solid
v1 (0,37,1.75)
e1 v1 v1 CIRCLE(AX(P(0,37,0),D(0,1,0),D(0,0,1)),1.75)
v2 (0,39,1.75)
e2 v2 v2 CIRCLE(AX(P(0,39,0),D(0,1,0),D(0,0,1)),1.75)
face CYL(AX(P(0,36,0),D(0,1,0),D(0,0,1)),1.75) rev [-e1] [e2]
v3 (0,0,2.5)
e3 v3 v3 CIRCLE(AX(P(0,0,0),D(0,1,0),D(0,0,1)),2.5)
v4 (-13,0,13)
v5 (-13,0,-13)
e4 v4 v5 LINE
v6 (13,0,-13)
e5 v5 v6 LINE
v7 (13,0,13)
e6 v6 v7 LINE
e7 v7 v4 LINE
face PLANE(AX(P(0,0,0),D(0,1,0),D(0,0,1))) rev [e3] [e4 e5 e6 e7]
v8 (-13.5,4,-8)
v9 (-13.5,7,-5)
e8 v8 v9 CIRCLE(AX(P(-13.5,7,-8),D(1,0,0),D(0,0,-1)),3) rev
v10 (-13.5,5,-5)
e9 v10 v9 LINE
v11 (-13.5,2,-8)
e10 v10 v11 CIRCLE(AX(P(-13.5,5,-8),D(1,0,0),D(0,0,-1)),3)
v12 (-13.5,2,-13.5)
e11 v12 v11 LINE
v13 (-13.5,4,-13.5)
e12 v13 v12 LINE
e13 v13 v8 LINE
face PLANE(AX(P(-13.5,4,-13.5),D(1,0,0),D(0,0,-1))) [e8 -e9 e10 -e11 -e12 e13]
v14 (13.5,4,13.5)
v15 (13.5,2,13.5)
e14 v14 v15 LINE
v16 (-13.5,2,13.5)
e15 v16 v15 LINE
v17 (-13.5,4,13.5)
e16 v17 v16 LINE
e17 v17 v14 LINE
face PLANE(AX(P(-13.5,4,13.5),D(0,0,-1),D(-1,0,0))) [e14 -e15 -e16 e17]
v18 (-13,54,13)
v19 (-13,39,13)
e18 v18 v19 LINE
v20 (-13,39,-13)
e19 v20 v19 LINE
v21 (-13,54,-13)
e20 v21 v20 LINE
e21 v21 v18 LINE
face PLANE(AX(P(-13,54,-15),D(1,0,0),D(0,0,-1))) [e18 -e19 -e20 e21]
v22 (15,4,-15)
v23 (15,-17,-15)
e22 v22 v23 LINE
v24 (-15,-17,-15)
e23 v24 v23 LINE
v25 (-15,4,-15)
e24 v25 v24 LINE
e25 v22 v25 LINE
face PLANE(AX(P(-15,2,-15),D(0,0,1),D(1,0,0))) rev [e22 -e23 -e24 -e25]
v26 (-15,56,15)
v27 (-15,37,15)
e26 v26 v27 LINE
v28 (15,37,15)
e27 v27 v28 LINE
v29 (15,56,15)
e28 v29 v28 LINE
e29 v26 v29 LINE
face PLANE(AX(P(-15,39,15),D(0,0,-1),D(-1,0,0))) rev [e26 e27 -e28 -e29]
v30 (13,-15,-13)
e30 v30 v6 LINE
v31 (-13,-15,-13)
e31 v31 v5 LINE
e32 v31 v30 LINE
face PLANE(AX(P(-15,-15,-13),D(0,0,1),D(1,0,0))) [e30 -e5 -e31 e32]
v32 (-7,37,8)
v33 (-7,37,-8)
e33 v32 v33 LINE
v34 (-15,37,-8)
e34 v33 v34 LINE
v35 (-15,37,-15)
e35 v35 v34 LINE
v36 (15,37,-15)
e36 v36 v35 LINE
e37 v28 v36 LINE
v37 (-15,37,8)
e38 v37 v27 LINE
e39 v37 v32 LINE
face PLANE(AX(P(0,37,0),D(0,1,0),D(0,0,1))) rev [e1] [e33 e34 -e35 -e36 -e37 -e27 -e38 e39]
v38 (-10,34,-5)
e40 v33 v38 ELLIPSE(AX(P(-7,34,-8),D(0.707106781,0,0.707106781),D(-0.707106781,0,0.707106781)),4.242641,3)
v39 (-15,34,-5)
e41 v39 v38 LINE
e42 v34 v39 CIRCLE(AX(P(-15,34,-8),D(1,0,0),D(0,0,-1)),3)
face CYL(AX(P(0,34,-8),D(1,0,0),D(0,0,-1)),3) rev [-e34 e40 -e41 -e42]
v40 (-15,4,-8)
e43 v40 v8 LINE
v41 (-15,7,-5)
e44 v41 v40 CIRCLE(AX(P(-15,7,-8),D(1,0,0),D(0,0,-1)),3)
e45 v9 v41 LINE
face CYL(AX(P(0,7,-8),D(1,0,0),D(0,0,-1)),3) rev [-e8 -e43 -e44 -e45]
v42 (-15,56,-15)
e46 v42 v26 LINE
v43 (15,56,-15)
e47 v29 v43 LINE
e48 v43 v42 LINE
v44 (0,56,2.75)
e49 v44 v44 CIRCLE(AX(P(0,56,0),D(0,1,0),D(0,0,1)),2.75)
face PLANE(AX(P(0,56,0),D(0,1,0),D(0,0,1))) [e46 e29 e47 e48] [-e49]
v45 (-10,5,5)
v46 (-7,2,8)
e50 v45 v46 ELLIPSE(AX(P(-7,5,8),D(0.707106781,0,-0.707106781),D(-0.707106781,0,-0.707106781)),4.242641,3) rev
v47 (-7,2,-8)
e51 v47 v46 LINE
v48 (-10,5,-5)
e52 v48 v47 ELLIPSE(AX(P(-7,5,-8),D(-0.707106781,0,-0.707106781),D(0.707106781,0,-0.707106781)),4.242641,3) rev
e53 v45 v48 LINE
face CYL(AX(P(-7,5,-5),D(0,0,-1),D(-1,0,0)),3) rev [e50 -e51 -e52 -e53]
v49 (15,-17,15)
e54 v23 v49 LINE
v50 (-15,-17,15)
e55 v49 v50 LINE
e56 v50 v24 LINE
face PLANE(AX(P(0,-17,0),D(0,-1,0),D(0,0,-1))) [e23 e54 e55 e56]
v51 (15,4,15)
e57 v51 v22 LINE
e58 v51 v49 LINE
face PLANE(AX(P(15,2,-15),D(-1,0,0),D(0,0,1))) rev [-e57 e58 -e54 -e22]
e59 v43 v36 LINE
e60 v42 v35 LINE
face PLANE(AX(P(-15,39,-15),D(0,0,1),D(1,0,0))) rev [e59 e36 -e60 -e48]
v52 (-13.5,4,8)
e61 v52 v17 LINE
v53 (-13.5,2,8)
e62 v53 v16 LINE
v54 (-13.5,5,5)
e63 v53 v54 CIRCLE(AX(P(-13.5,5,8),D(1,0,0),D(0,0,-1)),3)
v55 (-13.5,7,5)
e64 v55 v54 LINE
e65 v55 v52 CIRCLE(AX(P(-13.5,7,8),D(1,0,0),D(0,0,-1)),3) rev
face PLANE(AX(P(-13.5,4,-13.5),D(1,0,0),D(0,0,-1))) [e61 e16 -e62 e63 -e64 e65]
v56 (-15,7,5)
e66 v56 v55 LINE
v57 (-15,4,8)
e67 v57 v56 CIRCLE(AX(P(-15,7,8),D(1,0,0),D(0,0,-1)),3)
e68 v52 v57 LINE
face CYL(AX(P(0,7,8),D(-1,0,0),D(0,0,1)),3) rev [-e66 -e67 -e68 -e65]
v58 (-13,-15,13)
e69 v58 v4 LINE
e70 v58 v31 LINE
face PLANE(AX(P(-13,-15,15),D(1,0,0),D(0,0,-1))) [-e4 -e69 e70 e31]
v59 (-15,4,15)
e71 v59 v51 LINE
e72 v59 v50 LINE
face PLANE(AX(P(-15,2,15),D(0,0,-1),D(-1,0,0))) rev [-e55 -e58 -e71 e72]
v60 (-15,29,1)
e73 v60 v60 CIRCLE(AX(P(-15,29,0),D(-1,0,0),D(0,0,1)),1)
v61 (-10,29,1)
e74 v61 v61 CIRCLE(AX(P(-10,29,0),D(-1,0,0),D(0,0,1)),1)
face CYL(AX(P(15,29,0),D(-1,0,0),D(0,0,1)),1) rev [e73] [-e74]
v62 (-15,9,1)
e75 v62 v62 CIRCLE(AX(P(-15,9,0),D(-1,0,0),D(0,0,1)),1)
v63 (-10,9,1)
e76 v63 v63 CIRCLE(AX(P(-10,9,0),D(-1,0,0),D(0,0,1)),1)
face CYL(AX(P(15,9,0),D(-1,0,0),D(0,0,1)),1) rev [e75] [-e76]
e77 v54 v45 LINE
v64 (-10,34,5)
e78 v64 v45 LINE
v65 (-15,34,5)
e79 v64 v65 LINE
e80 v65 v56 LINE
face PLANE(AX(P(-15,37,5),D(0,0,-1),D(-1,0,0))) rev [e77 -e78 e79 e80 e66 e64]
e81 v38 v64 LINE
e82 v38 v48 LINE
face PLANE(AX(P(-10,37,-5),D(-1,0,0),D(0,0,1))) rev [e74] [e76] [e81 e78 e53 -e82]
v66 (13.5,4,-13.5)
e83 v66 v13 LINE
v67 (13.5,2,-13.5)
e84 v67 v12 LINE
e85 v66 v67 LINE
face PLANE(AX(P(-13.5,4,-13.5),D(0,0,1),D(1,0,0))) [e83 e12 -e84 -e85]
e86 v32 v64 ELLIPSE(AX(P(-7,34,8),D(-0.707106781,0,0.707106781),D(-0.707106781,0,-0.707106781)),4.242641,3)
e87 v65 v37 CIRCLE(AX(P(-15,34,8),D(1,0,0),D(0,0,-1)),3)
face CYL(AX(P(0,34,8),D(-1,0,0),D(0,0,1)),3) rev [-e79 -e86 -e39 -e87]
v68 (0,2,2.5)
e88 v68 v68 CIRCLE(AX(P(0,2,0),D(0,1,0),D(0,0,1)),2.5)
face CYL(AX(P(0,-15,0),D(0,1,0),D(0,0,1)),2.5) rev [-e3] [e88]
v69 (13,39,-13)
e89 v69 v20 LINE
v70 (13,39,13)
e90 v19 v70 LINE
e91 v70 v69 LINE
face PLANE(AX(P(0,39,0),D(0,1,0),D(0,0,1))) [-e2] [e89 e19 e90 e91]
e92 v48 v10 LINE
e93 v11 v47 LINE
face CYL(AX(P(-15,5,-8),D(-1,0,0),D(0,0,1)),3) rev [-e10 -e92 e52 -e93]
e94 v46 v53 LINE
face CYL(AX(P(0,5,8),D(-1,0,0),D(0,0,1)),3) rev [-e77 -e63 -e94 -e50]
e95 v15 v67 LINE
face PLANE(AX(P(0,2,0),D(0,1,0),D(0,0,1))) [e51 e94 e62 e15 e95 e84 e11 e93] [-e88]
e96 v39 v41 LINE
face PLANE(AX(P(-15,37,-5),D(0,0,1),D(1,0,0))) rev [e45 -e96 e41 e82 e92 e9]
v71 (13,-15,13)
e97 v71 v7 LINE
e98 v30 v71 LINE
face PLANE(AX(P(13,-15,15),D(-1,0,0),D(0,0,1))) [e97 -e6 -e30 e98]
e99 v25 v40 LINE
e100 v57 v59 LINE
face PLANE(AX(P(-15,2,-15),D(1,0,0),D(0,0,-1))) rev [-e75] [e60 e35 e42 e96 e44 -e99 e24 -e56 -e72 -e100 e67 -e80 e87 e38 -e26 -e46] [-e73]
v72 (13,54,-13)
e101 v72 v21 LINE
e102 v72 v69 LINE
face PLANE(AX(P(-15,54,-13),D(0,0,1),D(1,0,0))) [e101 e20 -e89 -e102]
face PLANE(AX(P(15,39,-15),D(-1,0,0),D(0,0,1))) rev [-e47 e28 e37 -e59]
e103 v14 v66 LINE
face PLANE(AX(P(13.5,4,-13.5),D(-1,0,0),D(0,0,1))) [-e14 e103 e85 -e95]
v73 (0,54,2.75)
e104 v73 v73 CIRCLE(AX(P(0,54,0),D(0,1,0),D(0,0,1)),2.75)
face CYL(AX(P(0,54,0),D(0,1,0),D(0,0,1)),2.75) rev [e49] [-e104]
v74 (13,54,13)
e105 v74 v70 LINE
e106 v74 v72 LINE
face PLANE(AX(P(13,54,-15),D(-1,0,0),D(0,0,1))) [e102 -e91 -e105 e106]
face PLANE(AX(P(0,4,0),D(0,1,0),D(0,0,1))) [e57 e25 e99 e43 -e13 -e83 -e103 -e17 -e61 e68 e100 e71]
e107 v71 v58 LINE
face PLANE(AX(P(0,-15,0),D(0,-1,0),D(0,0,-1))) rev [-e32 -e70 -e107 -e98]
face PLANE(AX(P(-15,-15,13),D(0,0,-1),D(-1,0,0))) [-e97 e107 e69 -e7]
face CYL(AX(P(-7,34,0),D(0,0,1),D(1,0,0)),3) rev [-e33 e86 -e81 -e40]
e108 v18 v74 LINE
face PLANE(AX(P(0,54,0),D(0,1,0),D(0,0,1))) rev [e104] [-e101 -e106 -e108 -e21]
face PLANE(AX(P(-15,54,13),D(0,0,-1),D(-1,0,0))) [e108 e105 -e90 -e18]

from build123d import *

# Parameters (mm, degrees)
SKETCH_2_W          = 30
SKETCH_2_H          = 30
EXTRUDE_1_DEPTH     = 2
SKETCH_3_W          = 30
SKETCH_3_H          = 30
SKETCH_3_W_2        = 26
SKETCH_3_H_2        = 26
EXTRUDE_2_DEPTH     = 15
SKETCH_4_W          = 30
SKETCH_4_H          = 30
SKETCH_4_W_2        = 27
SKETCH_4_H_2        = 27
EXTRUDE_3_DEPTH     = 2
SKETCH_5_W          = 5
SKETCH_5_H          = 10
EXTRUDE_2_2_DEPTH   = 35
SKETCH_6_R          = 1
CUT_EXTRUDE_1_DEPTH = 50.939963957
SKETCH_8_R          = 2.5
CUT_EXTRUDE_2_DEPTH = 41.926763859
FILLET_1_R          = 3
FILLET_2_R          = 3
SKETCH_9_W          = 30
SKETCH_9_H          = 30
EXTRUDE_3_2_DEPTH   = 2
SKETCH_10_W         = 30
SKETCH_10_H         = 30
SKETCH_10_W_2       = 26
SKETCH_10_H_2       = 26
EXTRUDE_4_DEPTH     = 15
SKETCH_11_R         = 1.75
CUT_EXTRUDE_3_DEPTH = 3
FILLET_3_R          = 3
SKETCH_13_W         = 30
SKETCH_13_H         = 30
EXTRUDE_4_2_DEPTH   = 2
SKETCH_14_W         = 30
SKETCH_14_H         = 30
EXTRUDE_5_DEPTH     = 2
SKETCH_15_R         = 2.75
CUT_EXTRUDE_4_DEPTH = 2


with BuildPart() as part:
    # Эскиз2 → Бобышка-Вытянуть1 (new body)
    with BuildSketch(Plane(origin=(0, 0, 0), x_dir=(1, 0, 0), z_dir=(0, 1, 0))):
        Rectangle(SKETCH_2_W, SKETCH_2_H)
    extrude(amount=EXTRUDE_1_DEPTH)

    # Эскиз3 → Extrude 2 (add)
    with BuildSketch(Plane.XZ):
        Rectangle(SKETCH_3_W, SKETCH_3_H)
        Rectangle(SKETCH_3_W_2, SKETCH_3_H_2, mode=Mode.SUBTRACT)
    extrude(amount=EXTRUDE_2_DEPTH)

    # Эскиз4 → Extrude 3 (add)
    with BuildSketch(Plane(origin=(0, 2, 0), x_dir=(1, 0, 0), z_dir=(0, 1, 0))):
        Rectangle(SKETCH_4_W, SKETCH_4_H)
        Rectangle(SKETCH_4_W_2, SKETCH_4_H_2, mode=Mode.SUBTRACT)
    extrude(amount=EXTRUDE_3_DEPTH)

    # Эскиз5 → Extrude 2 2 (add)
    with BuildSketch(Plane(origin=(0, 2, 0), x_dir=(1, 0, 0), z_dir=(0, 1, 0))):
        with Locations((-12.5, 0)):
            Rectangle(SKETCH_5_W, SKETCH_5_H)
    extrude(amount=EXTRUDE_2_2_DEPTH)

    # Эскиз6 → Вырез-Вытянуть1 (cut, through all)
    with BuildSketch(Plane.ZY.offset(15)):
        with Locations((0, 29)):
            Circle(SKETCH_6_R)
        with Locations((0, 9)):
            Circle(SKETCH_6_R)
    extrude(amount=-CUT_EXTRUDE_1_DEPTH, mode=Mode.SUBTRACT)

    # Эскиз8 → Вырез-Вытянуть2 (cut, through all)
    with BuildSketch(Plane(origin=(0, 2, 0), x_dir=(1, 0, 0), z_dir=(0, 1, 0))):
        with Locations(Location((0, 0, 0), (0, 0, 270))):
            Circle(SKETCH_8_R)
    extrude(amount=-CUT_EXTRUDE_2_DEPTH, mode=Mode.SUBTRACT)

    # Скругление1
    # the kernel refuses this fillet: 3 mm, written as the material it adds along each edge
    with BuildSketch(Plane(origin=(-10, 2, -5), x_dir=(1, 0, 0), z_dir=(0, 0, 1))) as fillet_1_piece_1:
        with BuildLine():
            CenterArc((FILLET_1_R, FILLET_1_R), FILLET_1_R, 180, 90)
            Line((0, FILLET_1_R), (0, 0))
            Line((0, 0), (FILLET_1_R, 0))
        make_face()
    extrude(amount=10)
    with BuildSketch(Plane(origin=(-21, 2, -5), x_dir=(0, 1, 0), z_dir=(1, 0, 0))) as fillet_1_piece_2_section:
        with BuildLine():
            CenterArc((FILLET_1_R, -FILLET_1_R), FILLET_1_R, 90, 90)
            Line((0, -FILLET_1_R), (0, 0))
            Line((0, 0), (FILLET_1_R, 0))
        make_face()
    fillet_1_piece_2 = extrude(amount=11, mode=Mode.PRIVATE)
    fillet_1_piece_2 = split(fillet_1_piece_2, bisect_by=Plane(origin=(-15, 2, -5), z_dir=(1, 0, 0)), keep=Keep.TOP, mode=Mode.PRIVATE)
    add(fillet_1_piece_2)
    with BuildSketch(Plane(origin=(-10, 2, 5), x_dir=(0, 1, 0), z_dir=(-1, 0, 0))) as fillet_1_piece_3_section:
        with BuildLine():
            CenterArc((FILLET_1_R, -FILLET_1_R), FILLET_1_R, 90, 90)
            Line((0, -FILLET_1_R), (0, 0))
            Line((0, 0), (FILLET_1_R, 0))
        make_face()
    fillet_1_piece_3 = extrude(amount=11, mode=Mode.PRIVATE)
    fillet_1_piece_3 = split(fillet_1_piece_3, bisect_by=Plane(origin=(-15, 2, 5), z_dir=(1, 0, 0)), keep=Keep.TOP, mode=Mode.PRIVATE)
    add(fillet_1_piece_3)
    with BuildSketch(Plane(origin=(-13.5, 2, -5), x_dir=(0, 1, 0), z_dir=(1, 0, 0))) as fillet_1_piece_4a_section:
        with BuildLine():
            CenterArc((FILLET_1_R, -FILLET_1_R), FILLET_1_R, 90, 90)
            Line((0, -FILLET_1_R), (0, 0))
            Line((0, 0), (FILLET_1_R, 0))
        make_face()
    fillet_1_piece_4a = extrude(amount=11, mode=Mode.PRIVATE)
    fillet_1_piece_4a = split(fillet_1_piece_4a, bisect_by=Plane(origin=(-10, 2, -5), z_dir=(1, 0, 0)), keep=Keep.TOP, mode=Mode.PRIVATE)
    with BuildSketch(Plane(origin=(-10, 2, -12.5), x_dir=(1, 0, 0), z_dir=(0, 0, 1))) as fillet_1_piece_4b_section:
        with BuildLine():
            CenterArc((FILLET_1_R, FILLET_1_R), FILLET_1_R, 180, 90)
            Line((0, FILLET_1_R), (0, 0))
            Line((0, 0), (FILLET_1_R, 0))
        make_face()
    fillet_1_piece_4b = extrude(amount=17.5, mode=Mode.PRIVATE)
    fillet_1_piece_4b = split(fillet_1_piece_4b, bisect_by=Plane(origin=(-10, 2, -5), z_dir=(0, 0, -1)), keep=Keep.TOP, mode=Mode.PRIVATE)
    fillet_1_piece_4 = fillet_1_piece_4a & fillet_1_piece_4b
    add(fillet_1_piece_4)
    with BuildSketch(Plane(origin=(-2.5, 2, 5), x_dir=(0, 1, 0), z_dir=(-1, 0, 0))) as fillet_1_piece_5a_section:
        with BuildLine():
            CenterArc((FILLET_1_R, -FILLET_1_R), FILLET_1_R, 90, 90)
            Line((0, -FILLET_1_R), (0, 0))
            Line((0, 0), (FILLET_1_R, 0))
        make_face()
    fillet_1_piece_5a = extrude(amount=11, mode=Mode.PRIVATE)
    fillet_1_piece_5a = split(fillet_1_piece_5a, bisect_by=Plane(origin=(-10, 2, 5), z_dir=(1, 0, 0)), keep=Keep.TOP, mode=Mode.PRIVATE)
    with BuildSketch(Plane(origin=(-10, 2, -5), x_dir=(1, 0, 0), z_dir=(0, 0, 1))) as fillet_1_piece_5b_section:
        with BuildLine():
            CenterArc((FILLET_1_R, FILLET_1_R), FILLET_1_R, 180, 90)
            Line((0, FILLET_1_R), (0, 0))
            Line((0, 0), (FILLET_1_R, 0))
        make_face()
    fillet_1_piece_5b = extrude(amount=17.5, mode=Mode.PRIVATE)
    fillet_1_piece_5b = split(fillet_1_piece_5b, bisect_by=Plane(origin=(-10, 2, 5), z_dir=(0, 0, 1)), keep=Keep.TOP, mode=Mode.PRIVATE)
    fillet_1_piece_5 = fillet_1_piece_5a & fillet_1_piece_5b
    add(fillet_1_piece_5)

    # Скругление2
    # the kernel refuses this fillet: 3 mm, written as the material it adds along each edge
    with BuildSketch(Plane(origin=(-13.5, 4, -5.171572875), x_dir=(0, 0.9983685980477195, 0.0570976569767209), z_dir=(-1, 0, 0)), Plane(origin=(-15, 4, 5.171572875), x_dir=(0, 0.9983685980477195, -0.0570976569767209), z_dir=(1, 0, 0))) as fillet_2_piece_1:
        with BuildLine():
            CenterArc((2.833609232, 2.995105794), FILLET_2_R, 183.273234946, 90)
            Line((-0.161496562, 2.823812823), (-0.461007141, 2.806683526))
            Line((-0.461007141, 2.806683526), (-0.299510579, -0.017129297))
            Line((-0.299510579, -0.017129297), (-0.083687204, -0.288091048))
            ThreePointArc((-0.083687204, -0.288091048), (1.025294304, -0.413705893), (3.0220315, -0.299510579))
            Line((3.0220315, -0.299510579), (3.004902203, 0))
        make_face()
    extrude(amount=1.5)

    # Эскиз9 → Extrude 3 2 (add)
    with BuildSketch(Plane(origin=(0, 37, 0), x_dir=(1, 0, 0), z_dir=(0, 1, 0))):
        Rectangle(SKETCH_9_W, SKETCH_9_H)
    extrude(amount=EXTRUDE_3_2_DEPTH)

    # Эскиз10 → Extrude 4 (add)
    with BuildSketch(Plane(origin=(0, 39, 0), x_dir=(1, 0, 0), z_dir=(0, 1, 0))):
        Rectangle(SKETCH_10_W, SKETCH_10_H)
        Rectangle(SKETCH_10_W_2, SKETCH_10_H_2, mode=Mode.SUBTRACT)
    extrude(amount=EXTRUDE_4_DEPTH)

    # Эскиз11 → Вырез-Вытянуть3 (cut)
    with BuildSketch(Plane(origin=(0, 39, 0), x_dir=(1, 0, 0), z_dir=(0, 1, 0))):
        with Locations(Location((0, 0, 0), (0, 0, 270))):
            Circle(SKETCH_11_R)
    extrude(amount=-CUT_EXTRUDE_3_DEPTH, mode=Mode.SUBTRACT)

    # Скругление3
    fillet_3_edges = [part.edges().sort_by_distance(p)[0] for p in [
        (-10, 37, 0),
        (-12.5, 37, -5),
        (-12.5, 37, 5),
    ]]
    fillet(fillet_3_edges, radius=FILLET_3_R)

    # Эскиз13 → Extrude 4 2 (add)
    with BuildSketch(Plane.XZ.offset(15)):
        Rectangle(SKETCH_13_W, SKETCH_13_H)
    extrude(amount=EXTRUDE_4_2_DEPTH)

    # Эскиз14 → Бобышка-Вытянуть5 (add)
    with BuildSketch(Plane(origin=(0, 54, 0), x_dir=(1, 0, 0), z_dir=(0, 1, 0))):
        Rectangle(SKETCH_14_W, SKETCH_14_H)
    extrude(amount=EXTRUDE_5_DEPTH)

    # Эскиз15 → Вырез-Вытянуть4 (cut)
    with BuildSketch(Plane(origin=(0, 56, 0), x_dir=(1, 0, 0), z_dir=(0, 1, 0))):
        with Locations(Location((0, 0, 0), (0, 0, 270))):
            Circle(SKETCH_15_R)
    extrude(amount=-CUT_EXTRUDE_4_DEPTH, mode=Mode.SUBTRACT)


solid = part.part
